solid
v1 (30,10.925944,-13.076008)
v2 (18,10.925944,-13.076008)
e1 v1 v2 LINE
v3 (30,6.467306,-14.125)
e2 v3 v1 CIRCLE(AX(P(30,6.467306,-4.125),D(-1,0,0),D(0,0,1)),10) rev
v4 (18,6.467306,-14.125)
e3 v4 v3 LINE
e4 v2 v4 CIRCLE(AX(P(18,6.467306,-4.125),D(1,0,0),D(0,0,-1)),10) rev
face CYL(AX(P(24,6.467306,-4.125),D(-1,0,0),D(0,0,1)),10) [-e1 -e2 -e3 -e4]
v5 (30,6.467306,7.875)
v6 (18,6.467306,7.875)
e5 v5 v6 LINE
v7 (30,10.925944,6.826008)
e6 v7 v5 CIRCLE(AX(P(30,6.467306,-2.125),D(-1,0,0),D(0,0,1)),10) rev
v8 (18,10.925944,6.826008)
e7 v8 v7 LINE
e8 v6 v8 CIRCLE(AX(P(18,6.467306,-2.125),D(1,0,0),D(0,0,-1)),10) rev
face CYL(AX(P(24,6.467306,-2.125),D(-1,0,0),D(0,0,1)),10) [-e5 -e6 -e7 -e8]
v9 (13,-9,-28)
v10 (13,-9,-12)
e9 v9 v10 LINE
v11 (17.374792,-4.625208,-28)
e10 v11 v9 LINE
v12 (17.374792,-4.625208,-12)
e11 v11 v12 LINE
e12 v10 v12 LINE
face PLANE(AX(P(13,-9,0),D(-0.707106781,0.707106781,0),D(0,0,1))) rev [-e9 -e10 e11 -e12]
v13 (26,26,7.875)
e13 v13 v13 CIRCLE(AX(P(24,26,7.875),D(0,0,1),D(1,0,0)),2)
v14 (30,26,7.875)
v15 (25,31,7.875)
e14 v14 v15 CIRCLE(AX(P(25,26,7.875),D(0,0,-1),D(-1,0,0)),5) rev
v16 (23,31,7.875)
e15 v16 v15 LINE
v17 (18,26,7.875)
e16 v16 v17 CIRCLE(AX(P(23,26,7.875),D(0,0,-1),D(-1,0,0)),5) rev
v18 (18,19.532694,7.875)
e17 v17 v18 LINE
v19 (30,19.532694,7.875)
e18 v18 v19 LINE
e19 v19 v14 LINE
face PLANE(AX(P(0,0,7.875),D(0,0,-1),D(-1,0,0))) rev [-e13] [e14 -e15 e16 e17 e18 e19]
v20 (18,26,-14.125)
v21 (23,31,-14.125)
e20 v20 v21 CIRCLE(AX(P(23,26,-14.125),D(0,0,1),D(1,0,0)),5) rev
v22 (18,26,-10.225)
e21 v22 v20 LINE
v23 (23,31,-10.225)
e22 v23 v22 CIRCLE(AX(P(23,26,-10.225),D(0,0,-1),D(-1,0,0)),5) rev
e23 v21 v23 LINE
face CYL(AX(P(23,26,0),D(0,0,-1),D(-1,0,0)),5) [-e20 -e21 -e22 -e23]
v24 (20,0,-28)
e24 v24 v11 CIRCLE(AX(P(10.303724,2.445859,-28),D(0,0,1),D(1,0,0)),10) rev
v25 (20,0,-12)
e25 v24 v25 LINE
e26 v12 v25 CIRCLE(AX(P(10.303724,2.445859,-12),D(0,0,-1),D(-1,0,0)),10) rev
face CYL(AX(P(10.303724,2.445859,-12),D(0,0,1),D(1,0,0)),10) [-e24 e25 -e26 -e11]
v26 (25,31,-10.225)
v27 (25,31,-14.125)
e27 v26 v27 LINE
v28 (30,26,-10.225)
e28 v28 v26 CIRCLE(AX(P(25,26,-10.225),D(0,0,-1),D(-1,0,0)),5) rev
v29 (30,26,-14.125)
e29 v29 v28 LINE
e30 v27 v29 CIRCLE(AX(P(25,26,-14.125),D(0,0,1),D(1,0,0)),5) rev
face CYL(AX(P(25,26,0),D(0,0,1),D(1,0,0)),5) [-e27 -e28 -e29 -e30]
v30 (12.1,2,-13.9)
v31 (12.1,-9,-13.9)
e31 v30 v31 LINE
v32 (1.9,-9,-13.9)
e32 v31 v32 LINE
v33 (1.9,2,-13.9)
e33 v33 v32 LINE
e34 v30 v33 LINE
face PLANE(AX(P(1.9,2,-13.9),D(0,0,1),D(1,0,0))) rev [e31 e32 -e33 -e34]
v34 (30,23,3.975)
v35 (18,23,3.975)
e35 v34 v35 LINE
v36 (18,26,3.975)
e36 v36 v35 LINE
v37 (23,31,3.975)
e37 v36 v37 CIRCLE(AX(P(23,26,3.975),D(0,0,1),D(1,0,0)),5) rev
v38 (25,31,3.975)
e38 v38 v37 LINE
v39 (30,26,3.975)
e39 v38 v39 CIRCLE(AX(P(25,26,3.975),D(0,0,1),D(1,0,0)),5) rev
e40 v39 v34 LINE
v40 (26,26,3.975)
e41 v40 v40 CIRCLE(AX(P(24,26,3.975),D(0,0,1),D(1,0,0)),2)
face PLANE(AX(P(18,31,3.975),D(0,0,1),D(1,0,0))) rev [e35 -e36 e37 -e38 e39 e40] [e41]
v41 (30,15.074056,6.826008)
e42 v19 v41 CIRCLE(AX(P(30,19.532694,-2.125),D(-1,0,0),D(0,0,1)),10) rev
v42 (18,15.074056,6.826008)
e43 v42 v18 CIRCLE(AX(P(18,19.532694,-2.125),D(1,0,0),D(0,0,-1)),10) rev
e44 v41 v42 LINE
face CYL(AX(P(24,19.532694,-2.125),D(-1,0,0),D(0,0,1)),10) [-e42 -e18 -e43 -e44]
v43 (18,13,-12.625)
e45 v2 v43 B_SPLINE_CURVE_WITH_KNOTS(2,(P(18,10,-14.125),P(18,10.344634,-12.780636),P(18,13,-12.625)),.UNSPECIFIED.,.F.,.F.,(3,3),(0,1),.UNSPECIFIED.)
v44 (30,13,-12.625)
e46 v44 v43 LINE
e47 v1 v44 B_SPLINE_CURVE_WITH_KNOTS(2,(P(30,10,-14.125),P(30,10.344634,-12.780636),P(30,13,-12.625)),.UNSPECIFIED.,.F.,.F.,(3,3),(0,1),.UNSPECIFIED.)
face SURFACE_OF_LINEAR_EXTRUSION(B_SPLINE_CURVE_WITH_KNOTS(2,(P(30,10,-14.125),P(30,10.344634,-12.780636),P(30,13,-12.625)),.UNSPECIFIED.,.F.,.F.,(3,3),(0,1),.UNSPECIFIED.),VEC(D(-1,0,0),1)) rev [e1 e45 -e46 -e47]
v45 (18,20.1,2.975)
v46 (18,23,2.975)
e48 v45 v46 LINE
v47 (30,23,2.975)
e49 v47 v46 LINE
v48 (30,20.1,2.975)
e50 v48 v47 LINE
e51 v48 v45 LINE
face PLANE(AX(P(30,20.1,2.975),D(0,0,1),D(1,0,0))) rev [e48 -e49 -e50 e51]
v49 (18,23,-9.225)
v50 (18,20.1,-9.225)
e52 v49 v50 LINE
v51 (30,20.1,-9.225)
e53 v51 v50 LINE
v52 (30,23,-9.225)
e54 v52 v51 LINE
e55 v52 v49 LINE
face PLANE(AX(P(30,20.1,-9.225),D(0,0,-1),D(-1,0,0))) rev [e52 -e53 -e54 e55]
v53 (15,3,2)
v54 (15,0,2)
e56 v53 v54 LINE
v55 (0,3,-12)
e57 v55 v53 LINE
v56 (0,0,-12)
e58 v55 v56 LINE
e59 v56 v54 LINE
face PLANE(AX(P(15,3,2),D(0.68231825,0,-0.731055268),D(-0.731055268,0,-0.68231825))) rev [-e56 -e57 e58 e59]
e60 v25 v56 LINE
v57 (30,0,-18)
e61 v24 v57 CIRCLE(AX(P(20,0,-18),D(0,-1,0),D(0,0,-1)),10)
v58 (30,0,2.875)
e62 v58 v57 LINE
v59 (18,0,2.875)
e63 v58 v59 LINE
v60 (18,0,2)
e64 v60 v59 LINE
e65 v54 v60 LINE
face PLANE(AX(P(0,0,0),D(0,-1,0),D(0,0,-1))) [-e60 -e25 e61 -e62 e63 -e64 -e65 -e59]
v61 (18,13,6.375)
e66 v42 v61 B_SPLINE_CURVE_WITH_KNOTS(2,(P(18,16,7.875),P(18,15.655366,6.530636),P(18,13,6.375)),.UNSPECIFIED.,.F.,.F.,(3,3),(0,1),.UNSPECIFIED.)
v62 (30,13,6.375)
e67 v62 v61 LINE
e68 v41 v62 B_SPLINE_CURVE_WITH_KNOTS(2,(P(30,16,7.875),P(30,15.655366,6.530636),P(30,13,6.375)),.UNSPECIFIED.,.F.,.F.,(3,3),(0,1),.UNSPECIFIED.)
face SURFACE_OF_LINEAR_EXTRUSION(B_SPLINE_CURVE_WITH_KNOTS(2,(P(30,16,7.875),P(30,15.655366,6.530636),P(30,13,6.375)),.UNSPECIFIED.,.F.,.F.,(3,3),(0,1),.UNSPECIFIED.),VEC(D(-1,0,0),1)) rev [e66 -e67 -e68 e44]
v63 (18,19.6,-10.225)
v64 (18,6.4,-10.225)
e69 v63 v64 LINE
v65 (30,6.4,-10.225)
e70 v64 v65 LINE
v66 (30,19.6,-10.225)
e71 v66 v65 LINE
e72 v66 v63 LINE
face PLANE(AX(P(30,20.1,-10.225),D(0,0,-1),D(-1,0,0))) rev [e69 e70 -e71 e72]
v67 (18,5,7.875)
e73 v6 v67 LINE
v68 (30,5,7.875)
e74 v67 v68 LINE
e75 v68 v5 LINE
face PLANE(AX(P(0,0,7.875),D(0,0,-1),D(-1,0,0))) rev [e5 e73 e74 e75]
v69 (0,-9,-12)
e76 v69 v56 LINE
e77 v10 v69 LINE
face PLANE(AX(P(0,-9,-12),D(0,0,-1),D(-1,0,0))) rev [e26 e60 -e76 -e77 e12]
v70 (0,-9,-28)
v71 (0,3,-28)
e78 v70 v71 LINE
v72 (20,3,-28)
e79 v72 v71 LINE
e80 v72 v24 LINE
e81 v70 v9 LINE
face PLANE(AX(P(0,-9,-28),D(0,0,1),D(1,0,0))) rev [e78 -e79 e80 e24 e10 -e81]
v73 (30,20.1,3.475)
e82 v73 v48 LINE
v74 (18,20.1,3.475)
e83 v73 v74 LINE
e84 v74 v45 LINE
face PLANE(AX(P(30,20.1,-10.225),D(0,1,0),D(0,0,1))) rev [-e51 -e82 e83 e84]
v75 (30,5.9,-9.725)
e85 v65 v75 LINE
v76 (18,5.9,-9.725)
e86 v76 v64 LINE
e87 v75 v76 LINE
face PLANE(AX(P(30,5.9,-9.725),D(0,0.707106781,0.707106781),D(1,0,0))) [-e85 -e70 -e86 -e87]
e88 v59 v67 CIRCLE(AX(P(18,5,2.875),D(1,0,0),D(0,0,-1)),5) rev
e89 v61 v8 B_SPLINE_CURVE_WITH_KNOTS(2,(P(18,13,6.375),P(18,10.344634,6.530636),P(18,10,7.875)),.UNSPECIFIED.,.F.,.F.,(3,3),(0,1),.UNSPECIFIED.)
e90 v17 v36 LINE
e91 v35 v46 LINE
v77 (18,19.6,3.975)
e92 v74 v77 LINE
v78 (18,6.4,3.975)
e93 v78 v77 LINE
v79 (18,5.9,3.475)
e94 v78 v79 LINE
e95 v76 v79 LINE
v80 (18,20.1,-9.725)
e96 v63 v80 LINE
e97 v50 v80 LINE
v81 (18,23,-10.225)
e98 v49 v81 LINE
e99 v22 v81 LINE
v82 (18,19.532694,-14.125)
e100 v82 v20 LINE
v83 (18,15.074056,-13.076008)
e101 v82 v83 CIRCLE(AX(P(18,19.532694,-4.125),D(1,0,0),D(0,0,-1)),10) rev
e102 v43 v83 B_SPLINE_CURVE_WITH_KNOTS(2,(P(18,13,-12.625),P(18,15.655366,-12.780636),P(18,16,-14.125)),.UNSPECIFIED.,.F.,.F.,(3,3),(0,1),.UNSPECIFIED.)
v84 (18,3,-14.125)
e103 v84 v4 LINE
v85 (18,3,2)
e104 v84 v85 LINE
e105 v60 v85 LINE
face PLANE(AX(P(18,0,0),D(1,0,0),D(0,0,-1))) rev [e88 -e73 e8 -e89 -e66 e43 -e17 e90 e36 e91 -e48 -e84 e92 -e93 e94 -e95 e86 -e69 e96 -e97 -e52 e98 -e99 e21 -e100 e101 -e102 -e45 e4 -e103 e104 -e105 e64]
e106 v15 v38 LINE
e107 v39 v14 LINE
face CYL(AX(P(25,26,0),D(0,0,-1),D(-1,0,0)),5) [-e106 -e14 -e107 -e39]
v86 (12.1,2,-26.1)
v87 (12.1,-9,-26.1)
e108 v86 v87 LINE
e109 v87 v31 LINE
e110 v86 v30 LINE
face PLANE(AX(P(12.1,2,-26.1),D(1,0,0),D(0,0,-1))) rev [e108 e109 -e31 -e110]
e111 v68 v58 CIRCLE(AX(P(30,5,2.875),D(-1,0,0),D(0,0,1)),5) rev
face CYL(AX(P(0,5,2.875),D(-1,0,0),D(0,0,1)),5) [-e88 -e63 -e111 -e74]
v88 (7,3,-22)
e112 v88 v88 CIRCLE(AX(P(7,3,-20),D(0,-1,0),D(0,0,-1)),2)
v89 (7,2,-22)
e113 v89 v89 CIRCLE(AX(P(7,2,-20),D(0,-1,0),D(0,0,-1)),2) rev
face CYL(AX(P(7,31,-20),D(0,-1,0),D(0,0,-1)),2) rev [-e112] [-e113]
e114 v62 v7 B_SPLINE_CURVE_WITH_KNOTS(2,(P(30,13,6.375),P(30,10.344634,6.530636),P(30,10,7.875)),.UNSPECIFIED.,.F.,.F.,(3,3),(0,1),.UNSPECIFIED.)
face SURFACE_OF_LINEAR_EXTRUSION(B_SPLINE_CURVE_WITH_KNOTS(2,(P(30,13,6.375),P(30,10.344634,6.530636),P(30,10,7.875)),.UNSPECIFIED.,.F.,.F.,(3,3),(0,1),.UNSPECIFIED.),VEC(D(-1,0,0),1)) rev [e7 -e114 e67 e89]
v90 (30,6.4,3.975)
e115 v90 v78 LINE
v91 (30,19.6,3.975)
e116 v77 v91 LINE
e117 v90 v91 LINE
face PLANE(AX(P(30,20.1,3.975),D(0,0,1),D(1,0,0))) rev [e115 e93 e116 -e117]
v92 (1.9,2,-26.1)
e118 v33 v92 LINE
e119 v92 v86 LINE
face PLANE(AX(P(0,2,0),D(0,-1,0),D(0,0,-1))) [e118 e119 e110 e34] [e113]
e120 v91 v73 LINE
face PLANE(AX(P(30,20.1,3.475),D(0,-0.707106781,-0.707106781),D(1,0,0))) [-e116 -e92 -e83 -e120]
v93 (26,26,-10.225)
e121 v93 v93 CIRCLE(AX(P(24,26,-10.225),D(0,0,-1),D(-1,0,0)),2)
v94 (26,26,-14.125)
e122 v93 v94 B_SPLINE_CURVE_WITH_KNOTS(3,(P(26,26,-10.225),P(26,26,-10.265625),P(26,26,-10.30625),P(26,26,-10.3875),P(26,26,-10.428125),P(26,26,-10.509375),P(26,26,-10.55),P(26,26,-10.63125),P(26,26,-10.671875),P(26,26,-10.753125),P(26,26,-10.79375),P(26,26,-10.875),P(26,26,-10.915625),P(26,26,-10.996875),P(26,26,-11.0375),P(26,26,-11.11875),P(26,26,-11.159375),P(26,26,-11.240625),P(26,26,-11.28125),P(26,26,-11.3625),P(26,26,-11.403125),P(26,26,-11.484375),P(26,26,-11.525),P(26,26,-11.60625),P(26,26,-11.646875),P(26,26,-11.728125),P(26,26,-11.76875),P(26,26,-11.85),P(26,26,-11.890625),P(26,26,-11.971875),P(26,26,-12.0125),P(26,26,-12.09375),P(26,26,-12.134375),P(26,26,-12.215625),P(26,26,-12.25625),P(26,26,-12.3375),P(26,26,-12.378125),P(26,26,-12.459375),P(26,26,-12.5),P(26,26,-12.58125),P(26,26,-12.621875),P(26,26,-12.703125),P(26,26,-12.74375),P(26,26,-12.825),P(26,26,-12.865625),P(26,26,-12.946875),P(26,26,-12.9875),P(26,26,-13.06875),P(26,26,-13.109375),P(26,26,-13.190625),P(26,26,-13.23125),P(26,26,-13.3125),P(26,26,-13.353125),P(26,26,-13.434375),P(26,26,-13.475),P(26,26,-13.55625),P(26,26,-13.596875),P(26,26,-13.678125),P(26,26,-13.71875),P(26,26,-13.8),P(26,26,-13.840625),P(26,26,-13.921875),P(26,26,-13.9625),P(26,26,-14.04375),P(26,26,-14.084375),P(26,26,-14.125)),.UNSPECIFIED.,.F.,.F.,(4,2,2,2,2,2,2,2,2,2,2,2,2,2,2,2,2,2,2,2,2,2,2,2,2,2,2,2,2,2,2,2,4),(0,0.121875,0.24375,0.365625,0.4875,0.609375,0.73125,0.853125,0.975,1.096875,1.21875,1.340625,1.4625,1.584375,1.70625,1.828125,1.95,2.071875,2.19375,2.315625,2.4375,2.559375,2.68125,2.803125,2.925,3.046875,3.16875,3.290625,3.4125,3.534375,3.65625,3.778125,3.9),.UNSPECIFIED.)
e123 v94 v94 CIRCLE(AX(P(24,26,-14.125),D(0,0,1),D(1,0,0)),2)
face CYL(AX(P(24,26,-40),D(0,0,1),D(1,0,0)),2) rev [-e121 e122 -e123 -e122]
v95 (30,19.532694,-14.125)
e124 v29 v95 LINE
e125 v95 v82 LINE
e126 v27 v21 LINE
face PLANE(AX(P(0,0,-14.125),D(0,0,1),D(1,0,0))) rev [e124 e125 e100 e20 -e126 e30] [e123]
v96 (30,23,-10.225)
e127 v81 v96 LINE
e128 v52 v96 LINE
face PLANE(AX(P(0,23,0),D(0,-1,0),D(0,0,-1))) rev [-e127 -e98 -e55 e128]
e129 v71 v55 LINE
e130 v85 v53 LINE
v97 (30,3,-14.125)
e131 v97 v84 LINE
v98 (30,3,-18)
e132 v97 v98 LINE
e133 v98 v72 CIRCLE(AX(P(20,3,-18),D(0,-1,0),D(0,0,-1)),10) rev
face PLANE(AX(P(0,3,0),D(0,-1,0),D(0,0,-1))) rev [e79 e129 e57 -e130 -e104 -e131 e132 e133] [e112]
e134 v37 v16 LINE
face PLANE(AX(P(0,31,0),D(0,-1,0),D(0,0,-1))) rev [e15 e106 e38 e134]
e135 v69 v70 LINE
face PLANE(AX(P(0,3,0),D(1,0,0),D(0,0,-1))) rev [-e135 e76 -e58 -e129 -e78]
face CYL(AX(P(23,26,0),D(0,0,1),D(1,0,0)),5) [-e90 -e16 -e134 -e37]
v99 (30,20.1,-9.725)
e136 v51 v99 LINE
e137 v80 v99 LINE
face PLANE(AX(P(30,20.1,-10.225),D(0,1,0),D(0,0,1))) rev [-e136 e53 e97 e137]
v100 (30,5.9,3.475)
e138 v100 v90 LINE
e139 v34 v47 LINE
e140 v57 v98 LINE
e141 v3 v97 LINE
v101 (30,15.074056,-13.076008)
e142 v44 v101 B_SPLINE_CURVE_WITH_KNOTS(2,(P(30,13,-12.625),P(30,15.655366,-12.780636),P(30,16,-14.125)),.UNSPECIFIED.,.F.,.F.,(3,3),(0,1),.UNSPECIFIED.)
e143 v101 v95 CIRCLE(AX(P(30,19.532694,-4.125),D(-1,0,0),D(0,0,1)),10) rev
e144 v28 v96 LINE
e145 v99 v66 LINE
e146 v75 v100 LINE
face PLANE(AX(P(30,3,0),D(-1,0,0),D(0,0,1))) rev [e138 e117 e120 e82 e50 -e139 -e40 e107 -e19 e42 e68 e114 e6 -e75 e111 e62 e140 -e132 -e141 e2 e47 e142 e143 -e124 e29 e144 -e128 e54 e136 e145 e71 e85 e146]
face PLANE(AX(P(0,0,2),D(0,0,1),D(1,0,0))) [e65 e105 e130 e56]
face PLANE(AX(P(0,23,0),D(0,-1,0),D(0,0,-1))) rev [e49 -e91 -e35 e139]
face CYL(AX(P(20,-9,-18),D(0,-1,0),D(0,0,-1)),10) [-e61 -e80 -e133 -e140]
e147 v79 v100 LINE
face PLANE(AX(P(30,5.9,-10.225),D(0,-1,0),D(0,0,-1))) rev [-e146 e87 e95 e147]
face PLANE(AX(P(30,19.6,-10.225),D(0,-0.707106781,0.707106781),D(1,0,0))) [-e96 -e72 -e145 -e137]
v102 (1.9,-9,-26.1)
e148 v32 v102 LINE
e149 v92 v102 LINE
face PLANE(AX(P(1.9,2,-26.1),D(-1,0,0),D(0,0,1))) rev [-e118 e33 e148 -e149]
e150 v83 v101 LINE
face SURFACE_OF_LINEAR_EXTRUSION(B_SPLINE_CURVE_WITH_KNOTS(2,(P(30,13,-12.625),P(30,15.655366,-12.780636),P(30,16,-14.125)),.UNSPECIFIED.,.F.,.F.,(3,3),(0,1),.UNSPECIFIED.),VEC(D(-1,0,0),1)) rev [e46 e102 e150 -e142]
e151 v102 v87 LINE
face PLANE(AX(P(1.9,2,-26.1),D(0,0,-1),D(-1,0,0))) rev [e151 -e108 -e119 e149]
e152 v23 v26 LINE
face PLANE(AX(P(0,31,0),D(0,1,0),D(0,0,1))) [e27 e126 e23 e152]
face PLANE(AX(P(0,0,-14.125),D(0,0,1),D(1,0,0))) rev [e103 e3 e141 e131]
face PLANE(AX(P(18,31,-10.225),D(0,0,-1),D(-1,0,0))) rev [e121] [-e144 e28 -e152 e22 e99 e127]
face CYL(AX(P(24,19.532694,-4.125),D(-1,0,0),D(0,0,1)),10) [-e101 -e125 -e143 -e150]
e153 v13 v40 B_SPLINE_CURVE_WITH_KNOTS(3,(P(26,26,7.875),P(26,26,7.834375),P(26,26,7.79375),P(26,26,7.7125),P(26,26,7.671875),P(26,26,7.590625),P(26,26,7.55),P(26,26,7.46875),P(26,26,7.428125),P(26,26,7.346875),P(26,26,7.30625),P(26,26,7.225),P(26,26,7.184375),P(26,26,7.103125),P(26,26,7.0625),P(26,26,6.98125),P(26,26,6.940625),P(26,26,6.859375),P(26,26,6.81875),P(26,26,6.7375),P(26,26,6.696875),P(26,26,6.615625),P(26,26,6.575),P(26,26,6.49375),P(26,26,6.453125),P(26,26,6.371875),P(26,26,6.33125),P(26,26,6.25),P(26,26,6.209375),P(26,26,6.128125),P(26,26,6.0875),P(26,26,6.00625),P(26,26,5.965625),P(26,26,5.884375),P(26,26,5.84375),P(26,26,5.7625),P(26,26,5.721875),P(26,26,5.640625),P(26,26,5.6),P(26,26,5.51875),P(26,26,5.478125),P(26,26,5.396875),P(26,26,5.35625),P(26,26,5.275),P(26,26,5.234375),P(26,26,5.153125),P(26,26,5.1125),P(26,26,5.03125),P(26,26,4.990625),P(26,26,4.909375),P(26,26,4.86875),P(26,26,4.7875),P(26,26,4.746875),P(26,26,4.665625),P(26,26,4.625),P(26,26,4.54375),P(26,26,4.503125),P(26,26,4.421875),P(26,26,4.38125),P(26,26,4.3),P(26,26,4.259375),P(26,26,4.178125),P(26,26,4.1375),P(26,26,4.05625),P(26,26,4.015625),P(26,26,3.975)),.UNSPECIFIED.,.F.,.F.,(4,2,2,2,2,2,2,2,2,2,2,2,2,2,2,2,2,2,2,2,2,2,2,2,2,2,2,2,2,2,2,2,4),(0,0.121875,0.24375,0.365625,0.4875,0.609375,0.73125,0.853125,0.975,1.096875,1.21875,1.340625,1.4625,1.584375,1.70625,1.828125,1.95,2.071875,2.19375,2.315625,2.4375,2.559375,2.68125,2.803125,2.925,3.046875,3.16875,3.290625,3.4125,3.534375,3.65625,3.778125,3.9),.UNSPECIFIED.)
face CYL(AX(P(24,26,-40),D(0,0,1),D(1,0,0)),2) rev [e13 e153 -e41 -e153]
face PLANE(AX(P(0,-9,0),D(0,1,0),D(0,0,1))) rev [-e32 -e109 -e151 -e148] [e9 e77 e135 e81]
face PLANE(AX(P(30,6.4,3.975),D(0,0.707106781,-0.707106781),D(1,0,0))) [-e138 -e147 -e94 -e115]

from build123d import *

# Parameters (mm, degrees)
ESQUISSE1_W                   = 30
ESQUISSE1_H                   = 40
BOSS_EXTRU_1_DEPTH            = 3
ESQUISSE8_W                   = 17
ESQUISSE8_H                   = 3.5
BOSS_EXTRU_2_DEPTH            = 20
ESQUISSE11_W                  = 3.5
ESQUISSE11_H                  = 20
ENL_V_MAT_EXTRU_9_DEPTH       = 5
ESQUISSE19_W                  = 12
ESQUISSE19_H                  = 20
BOSS_EXTRU_6_DEPTH            = 16.5
ESQUISSE20_W                  = 14.2
ESQUISSE20_H                  = 14.2
ENL_V_MAT_EXTRU_11_DEPTH      = 50.527769988
ESQUISSE29_W                  = 12
ESQUISSE29_H                  = 3
BOSS_EXTRU_9_DEPTH            = 17
ESQUISSE30_W                  = 12
ESQUISSE30_H                  = 23
BOSS_EXTRU_10_DEPTH           = 1
ESQUISSE31_W                  = 12
ESQUISSE31_H                  = 20
BOSS_EXTRU_11_DEPTH           = 1
ESQUISSE32_W                  = 12.2
ESQUISSE32_H                  = 2.9
ENL_V_MAT_EXTRU_12_DEPTH      = 50.527769988
ESQUISSE33_W                  = 12
ESQUISSE33_H                  = 3.9
BOSS_EXTRU_12_DEPTH           = 8
CONG_6_R                      = 5
ENL_V_MAT_EXTRU_14_DEPTH      = 53.417083332
ENL_V_MAT_EXTRU_14_DEPTH_BACK = 53.417083332
ESQUISSE36_R                  = 2
CHANFREIN1_SIZE               = 0.5
CONG_7_R                      = 5
ENL_V_MAT_EXTRU_15_DEPTH      = 54.712196008
CONG_8_R                      = 10
CONG_9_R                      = 10
ESQUISSE39_W                  = 30
ESQUISSE39_H                  = 3
BOSS_EXTRU_13_DEPTH           = 2
ESQUISSE40_W                  = 18
ESQUISSE40_H                  = 3
BOSS_EXTRU_14_DEPTH           = 2
ESQUISSE38_R                  = 2
ENL_V_MAT_EXTRU_16_DEPTH      = 61.207973065
ESQUISSE41_W                  = 14
ESQUISSE41_H                  = 16
ESQUISSE41_W_2                = 10
ESQUISSE41_H_2                = 12
BOSS_EXTRU_15_DEPTH           = 9
ESQUISSE42_W                  = 10
ESQUISSE42_H                  = 12
ENL_V_MAT_EXTRU_17_DEPTH      = 2
ESQUISSE43_W                  = 30
ESQUISSE43_H                  = 14
ENL_V_MAT_EXTRU_19_DEPTH      = 3
CONG_10_R                     = 10
ESQUISSE44_W                  = 6
ESQUISSE44_H                  = 16
BOSS_EXTRU_16_DEPTH           = 9
CHANFREIN2_SIZE               = 7
CONG_11_R                     = 10
ESQUISSE46_W                  = 10.2
ESQUISSE46_H                  = 12.2
ENL_V_MAT_EXTRU_20_DEPTH      = 11


with BuildPart() as part:
    # Esquisse1 → Boss.-Extru.1 (new body)
    with BuildSketch(Plane(origin=(0, 0, 0), x_dir=(1, 0, 0), z_dir=(0, 1, 0))):
        with Locations((15, 20)):
            Rectangle(ESQUISSE1_W, ESQUISSE1_H)
    extrude(amount=BOSS_EXTRU_1_DEPTH)

    # Esquisse8 → Boss.-Extru.2 (add)
    with BuildSketch(Plane(origin=(0, 3, 0), x_dir=(1, 0, 0), z_dir=(0, 1, 0))):
        with Locations((21.5, 11.375)):
            Rectangle(ESQUISSE8_W, ESQUISSE8_H)
    extrude(amount=BOSS_EXTRU_2_DEPTH)

    # Esquisse11 → Enlèv. mat.-Extru.9 (cut)
    with BuildSketch(Plane.ZY.offset(-13)):
        with Locations((-11.375, 13)):
            Rectangle(ESQUISSE11_W, ESQUISSE11_H)
    extrude(amount=-ENL_V_MAT_EXTRU_9_DEPTH, mode=Mode.SUBTRACT)

    # Esquisse19 → Boss.-Extru.6 (add)
    with BuildSketch(Plane.XY.offset(-9.625)):
        with Locations((24, 13)):
            Rectangle(ESQUISSE19_W, ESQUISSE19_H)
    extrude(amount=BOSS_EXTRU_6_DEPTH)

    # Esquisse20 → Enlèv. mat.-Extru.11 (cut, through all)
    with BuildSketch(Plane.ZY.offset(-18)):
        with Locations((-3.125, 13)):
            Rectangle(ESQUISSE20_W, ESQUISSE20_H)
    extrude(amount=-ENL_V_MAT_EXTRU_11_DEPTH, mode=Mode.SUBTRACT)

    # Esquisse29 → Boss.-Extru.9 (add)
    with BuildSketch(Plane.XY.offset(6.875)):
        with Locations((24, 1.5)):
            Rectangle(ESQUISSE29_W, ESQUISSE29_H)
    extrude(amount=-BOSS_EXTRU_9_DEPTH)

    # Esquisse30 → Boss.-Extru.10 (add)
    with BuildSketch(Plane.XY.offset(6.875)):
        with Locations((24, 11.5)):
            Rectangle(ESQUISSE30_W, ESQUISSE30_H)
    extrude(amount=BOSS_EXTRU_10_DEPTH)

    # Esquisse31 → Boss.-Extru.11 (add)
    with BuildSketch(Plane(origin=(0, 0, -13.125), x_dir=(-1, 0, 0), z_dir=(0, 0, -1))):
        with Locations((-24, 13)):
            Rectangle(ESQUISSE31_W, ESQUISSE31_H)
    extrude(amount=BOSS_EXTRU_11_DEPTH)

    # Esquisse32 → Enlèv. mat.-Extru.12 (cut, through all)
    with BuildSketch(Plane.ZY.offset(-18)):
        with Locations((-3.125, 21.55)):
            Rectangle(ESQUISSE32_W, ESQUISSE32_H)
    extrude(amount=-ENL_V_MAT_EXTRU_12_DEPTH, mode=Mode.SUBTRACT)

    # Esquisse33 → Boss.-Extru.12 (add)
    with BuildSketch(Plane(origin=(0, 23, 0), x_dir=(1, 0, 0), z_dir=(0, 1, 0))):
        with Locations((24, 12.175)):
            Rectangle(ESQUISSE33_W, ESQUISSE33_H)
        with Locations((24, -5.925)):
            Rectangle(ESQUISSE33_W, ESQUISSE33_H)
    extrude(amount=BOSS_EXTRU_12_DEPTH)

    # Congé6
    cong_6_edges = [part.edges().sort_by_distance(p)[0] for p in [
        (18, 31, -12.175),
        (30, 31, -12.175),
        (18, 31, 5.925),
        (30, 31, 5.925),
    ]]
    fillet(cong_6_edges, radius=CONG_6_R)

    # Esquisse36 → Enlèv. mat.-Extru.14 (cut, two sides: drawn at the far end of the back side and taken through both)
    with BuildSketch(Plane.XY.offset(-10.225).offset(-ENL_V_MAT_EXTRU_14_DEPTH_BACK)):
        with Locations((24, 26)):
            Circle(ESQUISSE36_R)
    extrude(amount=ENL_V_MAT_EXTRU_14_DEPTH + ENL_V_MAT_EXTRU_14_DEPTH_BACK, mode=Mode.SUBTRACT)

    # Chanfrein1
    chanfrein1_edges = [part.edges().sort_by_distance(p)[0] for p in [
        (24, 5.9, -10.225),
        (24, 20.1, -10.225),
        (24, 20.1, 3.975),
        (24, 5.9, 3.975),
    ]]
    chamfer(chanfrein1_edges, length=CHANFREIN1_SIZE)

    # Congé7
    cong_7_edges = [part.edges().sort_by_distance(p)[0] for p in [
        (24, 0, 7.875),
    ]]
    fillet(cong_7_edges, radius=CONG_7_R)

    # Esquisse37 → Enlèv. mat.-Extru.15 (cut, through all)
    with BuildSketch(Plane.ZY.offset(-18)):
        with BuildLine():
            Line((-14.125, 16), (-14.125, 10))
            add(Edge.make_bspline(
                [(-14.125, 10), (-12.780635922, 10.344634173), (-12.625, 13)],
                knots=[0, 0, 0, 1, 1, 1], degree=2))
            add(Edge.make_bspline(
                [(-14.125, 16), (-12.780635922, 15.655365827), (-12.625, 13)],
                knots=[0, 0, 0, 1, 1, 1], degree=2))
        make_face()
        with BuildLine():
            Line((7.875, 16), (7.875, 10))
            add(Edge.make_bspline(
                [(7.875, 10), (6.530635922, 10.344634173), (6.375, 13)],
                knots=[0, 0, 0, 1, 1, 1], degree=2))
            add(Edge.make_bspline(
                [(7.875, 16), (6.530635922, 15.655365827), (6.375, 13)],
                knots=[0, 0, 0, 1, 1, 1], degree=2))
        make_face()
    extrude(amount=-ENL_V_MAT_EXTRU_15_DEPTH, mode=Mode.SUBTRACT)

    # Congé8
    cong_8_edges = [part.edges().sort_by_distance(p)[0] for p in [
        (24, 10, 7.875),
        (24, 16, 7.875),
    ]]
    fillet(cong_8_edges, radius=CONG_8_R)

    # Congé9
    cong_9_edges = [part.edges().sort_by_distance(p)[0] for p in [
        (24, 16, -14.125),
        (24, 10, -14.125),
    ]]
    fillet(cong_9_edges, radius=CONG_9_R)

    # Esquisse39 → Boss.-Extru.13 (add)
    with BuildSketch(Plane(origin=(0, 0, -40), x_dir=(-1, 0, 0), z_dir=(0, 0, -1))):
        with Locations((-15, 1.5)):
            Rectangle(ESQUISSE39_W, ESQUISSE39_H)
    extrude(amount=BOSS_EXTRU_13_DEPTH)

    # Esquisse40 → Boss.-Extru.14 (add)
    with BuildSketch(Plane.XY):
        with Locations((9, 1.5)):
            Rectangle(ESQUISSE40_W, ESQUISSE40_H)
    extrude(amount=BOSS_EXTRU_14_DEPTH)

    # Esquisse38 → Enlèv. mat.-Extru.16 (cut, through all)
    with BuildSketch(Plane.XZ):
        with Locations(Location((7, -20, 0), (0, 0, 270))):
            Circle(ESQUISSE38_R)
    extrude(amount=-ENL_V_MAT_EXTRU_16_DEPTH, mode=Mode.SUBTRACT)

    # Esquisse41 → Boss.-Extru.15 (add)
    with BuildSketch(Plane.XZ):
        with Locations((7, -20)):
            Rectangle(ESQUISSE41_W, ESQUISSE41_H)
        with Locations((7, -20)):
            Rectangle(ESQUISSE41_W_2, ESQUISSE41_H_2, mode=Mode.SUBTRACT)
    extrude(amount=BOSS_EXTRU_15_DEPTH)

    # Esquisse42 → Enlèv. mat.-Extru.17 (cut)
    with BuildSketch(Plane.XZ):
        with Locations((7, -20)):
            Rectangle(ESQUISSE42_W, ESQUISSE42_H)
    extrude(amount=-ENL_V_MAT_EXTRU_17_DEPTH, mode=Mode.SUBTRACT)

    # Esquisse43 → Enlèv. mat.-Extru.19 (cut)
    with BuildSketch(Plane.XZ):
        with Locations((15, -35)):
            Rectangle(ESQUISSE43_W, ESQUISSE43_H)
        Polygon((0, -12), (0, 2), (15, 2), align=None)
    extrude(amount=-ENL_V_MAT_EXTRU_19_DEPTH, mode=Mode.SUBTRACT)

    # Congé10
    cong_10_edges = [part.edges().sort_by_distance(p)[0] for p in [
        (30, 1.5, -28),
    ]]
    fillet(cong_10_edges, radius=CONG_10_R)

    # Esquisse44 → Boss.-Extru.16 (add)
    with BuildSketch(Plane.XZ):
        with Locations((17, -20)):
            Rectangle(ESQUISSE44_W, ESQUISSE44_H)
    extrude(amount=BOSS_EXTRU_16_DEPTH)

    # Chanfrein2
    chanfrein2_edges = [part.edges().sort_by_distance(p)[0] for p in [
        (20, -9, -20),
    ]]
    chamfer(chanfrein2_edges, length=CHANFREIN2_SIZE)

    # Congé11
    # the kernel refuses this fillet: 10 mm, written as the material it takes off along each edge
    with BuildSketch(Plane(origin=(20, -2, -2.718486848), x_dir=(-0.7071067811865474, -0.7071067811865477, 0), z_dir=(0, 0, -1))) as cong_11_piece_1:
        with BuildLine():
            CenterArc((3.712605261, 10), CONG_11_R, 239.157365729, 30.842634271)
            Line((-1.414213562, 1.414213562), (-1.516749939, 1.242497834))
            ThreePointArc((-1.516749939, 1.242497834), (-0.848528137, 0.565685425), (-0.141421356, -0.141421356))
            Line((-0.141421356, -0.141421356), (0, -0.2))
            Line((0, -0.2), (3.712605261, -0.2))
            Line((3.712605261, -0.2), (3.712605261, 0))
        make_face()
    extrude(amount=34.563026305, mode=Mode.SUBTRACT)

    # Esquisse46 → Enlèv. mat.-Extru.20 (cut)
    with BuildSketch(Plane.XZ.offset(9)):
        with Locations((7, -20)):
            Rectangle(ESQUISSE46_W, ESQUISSE46_H)
    extrude(amount=-ENL_V_MAT_EXTRU_20_DEPTH, mode=Mode.SUBTRACT)


solid = part.part
